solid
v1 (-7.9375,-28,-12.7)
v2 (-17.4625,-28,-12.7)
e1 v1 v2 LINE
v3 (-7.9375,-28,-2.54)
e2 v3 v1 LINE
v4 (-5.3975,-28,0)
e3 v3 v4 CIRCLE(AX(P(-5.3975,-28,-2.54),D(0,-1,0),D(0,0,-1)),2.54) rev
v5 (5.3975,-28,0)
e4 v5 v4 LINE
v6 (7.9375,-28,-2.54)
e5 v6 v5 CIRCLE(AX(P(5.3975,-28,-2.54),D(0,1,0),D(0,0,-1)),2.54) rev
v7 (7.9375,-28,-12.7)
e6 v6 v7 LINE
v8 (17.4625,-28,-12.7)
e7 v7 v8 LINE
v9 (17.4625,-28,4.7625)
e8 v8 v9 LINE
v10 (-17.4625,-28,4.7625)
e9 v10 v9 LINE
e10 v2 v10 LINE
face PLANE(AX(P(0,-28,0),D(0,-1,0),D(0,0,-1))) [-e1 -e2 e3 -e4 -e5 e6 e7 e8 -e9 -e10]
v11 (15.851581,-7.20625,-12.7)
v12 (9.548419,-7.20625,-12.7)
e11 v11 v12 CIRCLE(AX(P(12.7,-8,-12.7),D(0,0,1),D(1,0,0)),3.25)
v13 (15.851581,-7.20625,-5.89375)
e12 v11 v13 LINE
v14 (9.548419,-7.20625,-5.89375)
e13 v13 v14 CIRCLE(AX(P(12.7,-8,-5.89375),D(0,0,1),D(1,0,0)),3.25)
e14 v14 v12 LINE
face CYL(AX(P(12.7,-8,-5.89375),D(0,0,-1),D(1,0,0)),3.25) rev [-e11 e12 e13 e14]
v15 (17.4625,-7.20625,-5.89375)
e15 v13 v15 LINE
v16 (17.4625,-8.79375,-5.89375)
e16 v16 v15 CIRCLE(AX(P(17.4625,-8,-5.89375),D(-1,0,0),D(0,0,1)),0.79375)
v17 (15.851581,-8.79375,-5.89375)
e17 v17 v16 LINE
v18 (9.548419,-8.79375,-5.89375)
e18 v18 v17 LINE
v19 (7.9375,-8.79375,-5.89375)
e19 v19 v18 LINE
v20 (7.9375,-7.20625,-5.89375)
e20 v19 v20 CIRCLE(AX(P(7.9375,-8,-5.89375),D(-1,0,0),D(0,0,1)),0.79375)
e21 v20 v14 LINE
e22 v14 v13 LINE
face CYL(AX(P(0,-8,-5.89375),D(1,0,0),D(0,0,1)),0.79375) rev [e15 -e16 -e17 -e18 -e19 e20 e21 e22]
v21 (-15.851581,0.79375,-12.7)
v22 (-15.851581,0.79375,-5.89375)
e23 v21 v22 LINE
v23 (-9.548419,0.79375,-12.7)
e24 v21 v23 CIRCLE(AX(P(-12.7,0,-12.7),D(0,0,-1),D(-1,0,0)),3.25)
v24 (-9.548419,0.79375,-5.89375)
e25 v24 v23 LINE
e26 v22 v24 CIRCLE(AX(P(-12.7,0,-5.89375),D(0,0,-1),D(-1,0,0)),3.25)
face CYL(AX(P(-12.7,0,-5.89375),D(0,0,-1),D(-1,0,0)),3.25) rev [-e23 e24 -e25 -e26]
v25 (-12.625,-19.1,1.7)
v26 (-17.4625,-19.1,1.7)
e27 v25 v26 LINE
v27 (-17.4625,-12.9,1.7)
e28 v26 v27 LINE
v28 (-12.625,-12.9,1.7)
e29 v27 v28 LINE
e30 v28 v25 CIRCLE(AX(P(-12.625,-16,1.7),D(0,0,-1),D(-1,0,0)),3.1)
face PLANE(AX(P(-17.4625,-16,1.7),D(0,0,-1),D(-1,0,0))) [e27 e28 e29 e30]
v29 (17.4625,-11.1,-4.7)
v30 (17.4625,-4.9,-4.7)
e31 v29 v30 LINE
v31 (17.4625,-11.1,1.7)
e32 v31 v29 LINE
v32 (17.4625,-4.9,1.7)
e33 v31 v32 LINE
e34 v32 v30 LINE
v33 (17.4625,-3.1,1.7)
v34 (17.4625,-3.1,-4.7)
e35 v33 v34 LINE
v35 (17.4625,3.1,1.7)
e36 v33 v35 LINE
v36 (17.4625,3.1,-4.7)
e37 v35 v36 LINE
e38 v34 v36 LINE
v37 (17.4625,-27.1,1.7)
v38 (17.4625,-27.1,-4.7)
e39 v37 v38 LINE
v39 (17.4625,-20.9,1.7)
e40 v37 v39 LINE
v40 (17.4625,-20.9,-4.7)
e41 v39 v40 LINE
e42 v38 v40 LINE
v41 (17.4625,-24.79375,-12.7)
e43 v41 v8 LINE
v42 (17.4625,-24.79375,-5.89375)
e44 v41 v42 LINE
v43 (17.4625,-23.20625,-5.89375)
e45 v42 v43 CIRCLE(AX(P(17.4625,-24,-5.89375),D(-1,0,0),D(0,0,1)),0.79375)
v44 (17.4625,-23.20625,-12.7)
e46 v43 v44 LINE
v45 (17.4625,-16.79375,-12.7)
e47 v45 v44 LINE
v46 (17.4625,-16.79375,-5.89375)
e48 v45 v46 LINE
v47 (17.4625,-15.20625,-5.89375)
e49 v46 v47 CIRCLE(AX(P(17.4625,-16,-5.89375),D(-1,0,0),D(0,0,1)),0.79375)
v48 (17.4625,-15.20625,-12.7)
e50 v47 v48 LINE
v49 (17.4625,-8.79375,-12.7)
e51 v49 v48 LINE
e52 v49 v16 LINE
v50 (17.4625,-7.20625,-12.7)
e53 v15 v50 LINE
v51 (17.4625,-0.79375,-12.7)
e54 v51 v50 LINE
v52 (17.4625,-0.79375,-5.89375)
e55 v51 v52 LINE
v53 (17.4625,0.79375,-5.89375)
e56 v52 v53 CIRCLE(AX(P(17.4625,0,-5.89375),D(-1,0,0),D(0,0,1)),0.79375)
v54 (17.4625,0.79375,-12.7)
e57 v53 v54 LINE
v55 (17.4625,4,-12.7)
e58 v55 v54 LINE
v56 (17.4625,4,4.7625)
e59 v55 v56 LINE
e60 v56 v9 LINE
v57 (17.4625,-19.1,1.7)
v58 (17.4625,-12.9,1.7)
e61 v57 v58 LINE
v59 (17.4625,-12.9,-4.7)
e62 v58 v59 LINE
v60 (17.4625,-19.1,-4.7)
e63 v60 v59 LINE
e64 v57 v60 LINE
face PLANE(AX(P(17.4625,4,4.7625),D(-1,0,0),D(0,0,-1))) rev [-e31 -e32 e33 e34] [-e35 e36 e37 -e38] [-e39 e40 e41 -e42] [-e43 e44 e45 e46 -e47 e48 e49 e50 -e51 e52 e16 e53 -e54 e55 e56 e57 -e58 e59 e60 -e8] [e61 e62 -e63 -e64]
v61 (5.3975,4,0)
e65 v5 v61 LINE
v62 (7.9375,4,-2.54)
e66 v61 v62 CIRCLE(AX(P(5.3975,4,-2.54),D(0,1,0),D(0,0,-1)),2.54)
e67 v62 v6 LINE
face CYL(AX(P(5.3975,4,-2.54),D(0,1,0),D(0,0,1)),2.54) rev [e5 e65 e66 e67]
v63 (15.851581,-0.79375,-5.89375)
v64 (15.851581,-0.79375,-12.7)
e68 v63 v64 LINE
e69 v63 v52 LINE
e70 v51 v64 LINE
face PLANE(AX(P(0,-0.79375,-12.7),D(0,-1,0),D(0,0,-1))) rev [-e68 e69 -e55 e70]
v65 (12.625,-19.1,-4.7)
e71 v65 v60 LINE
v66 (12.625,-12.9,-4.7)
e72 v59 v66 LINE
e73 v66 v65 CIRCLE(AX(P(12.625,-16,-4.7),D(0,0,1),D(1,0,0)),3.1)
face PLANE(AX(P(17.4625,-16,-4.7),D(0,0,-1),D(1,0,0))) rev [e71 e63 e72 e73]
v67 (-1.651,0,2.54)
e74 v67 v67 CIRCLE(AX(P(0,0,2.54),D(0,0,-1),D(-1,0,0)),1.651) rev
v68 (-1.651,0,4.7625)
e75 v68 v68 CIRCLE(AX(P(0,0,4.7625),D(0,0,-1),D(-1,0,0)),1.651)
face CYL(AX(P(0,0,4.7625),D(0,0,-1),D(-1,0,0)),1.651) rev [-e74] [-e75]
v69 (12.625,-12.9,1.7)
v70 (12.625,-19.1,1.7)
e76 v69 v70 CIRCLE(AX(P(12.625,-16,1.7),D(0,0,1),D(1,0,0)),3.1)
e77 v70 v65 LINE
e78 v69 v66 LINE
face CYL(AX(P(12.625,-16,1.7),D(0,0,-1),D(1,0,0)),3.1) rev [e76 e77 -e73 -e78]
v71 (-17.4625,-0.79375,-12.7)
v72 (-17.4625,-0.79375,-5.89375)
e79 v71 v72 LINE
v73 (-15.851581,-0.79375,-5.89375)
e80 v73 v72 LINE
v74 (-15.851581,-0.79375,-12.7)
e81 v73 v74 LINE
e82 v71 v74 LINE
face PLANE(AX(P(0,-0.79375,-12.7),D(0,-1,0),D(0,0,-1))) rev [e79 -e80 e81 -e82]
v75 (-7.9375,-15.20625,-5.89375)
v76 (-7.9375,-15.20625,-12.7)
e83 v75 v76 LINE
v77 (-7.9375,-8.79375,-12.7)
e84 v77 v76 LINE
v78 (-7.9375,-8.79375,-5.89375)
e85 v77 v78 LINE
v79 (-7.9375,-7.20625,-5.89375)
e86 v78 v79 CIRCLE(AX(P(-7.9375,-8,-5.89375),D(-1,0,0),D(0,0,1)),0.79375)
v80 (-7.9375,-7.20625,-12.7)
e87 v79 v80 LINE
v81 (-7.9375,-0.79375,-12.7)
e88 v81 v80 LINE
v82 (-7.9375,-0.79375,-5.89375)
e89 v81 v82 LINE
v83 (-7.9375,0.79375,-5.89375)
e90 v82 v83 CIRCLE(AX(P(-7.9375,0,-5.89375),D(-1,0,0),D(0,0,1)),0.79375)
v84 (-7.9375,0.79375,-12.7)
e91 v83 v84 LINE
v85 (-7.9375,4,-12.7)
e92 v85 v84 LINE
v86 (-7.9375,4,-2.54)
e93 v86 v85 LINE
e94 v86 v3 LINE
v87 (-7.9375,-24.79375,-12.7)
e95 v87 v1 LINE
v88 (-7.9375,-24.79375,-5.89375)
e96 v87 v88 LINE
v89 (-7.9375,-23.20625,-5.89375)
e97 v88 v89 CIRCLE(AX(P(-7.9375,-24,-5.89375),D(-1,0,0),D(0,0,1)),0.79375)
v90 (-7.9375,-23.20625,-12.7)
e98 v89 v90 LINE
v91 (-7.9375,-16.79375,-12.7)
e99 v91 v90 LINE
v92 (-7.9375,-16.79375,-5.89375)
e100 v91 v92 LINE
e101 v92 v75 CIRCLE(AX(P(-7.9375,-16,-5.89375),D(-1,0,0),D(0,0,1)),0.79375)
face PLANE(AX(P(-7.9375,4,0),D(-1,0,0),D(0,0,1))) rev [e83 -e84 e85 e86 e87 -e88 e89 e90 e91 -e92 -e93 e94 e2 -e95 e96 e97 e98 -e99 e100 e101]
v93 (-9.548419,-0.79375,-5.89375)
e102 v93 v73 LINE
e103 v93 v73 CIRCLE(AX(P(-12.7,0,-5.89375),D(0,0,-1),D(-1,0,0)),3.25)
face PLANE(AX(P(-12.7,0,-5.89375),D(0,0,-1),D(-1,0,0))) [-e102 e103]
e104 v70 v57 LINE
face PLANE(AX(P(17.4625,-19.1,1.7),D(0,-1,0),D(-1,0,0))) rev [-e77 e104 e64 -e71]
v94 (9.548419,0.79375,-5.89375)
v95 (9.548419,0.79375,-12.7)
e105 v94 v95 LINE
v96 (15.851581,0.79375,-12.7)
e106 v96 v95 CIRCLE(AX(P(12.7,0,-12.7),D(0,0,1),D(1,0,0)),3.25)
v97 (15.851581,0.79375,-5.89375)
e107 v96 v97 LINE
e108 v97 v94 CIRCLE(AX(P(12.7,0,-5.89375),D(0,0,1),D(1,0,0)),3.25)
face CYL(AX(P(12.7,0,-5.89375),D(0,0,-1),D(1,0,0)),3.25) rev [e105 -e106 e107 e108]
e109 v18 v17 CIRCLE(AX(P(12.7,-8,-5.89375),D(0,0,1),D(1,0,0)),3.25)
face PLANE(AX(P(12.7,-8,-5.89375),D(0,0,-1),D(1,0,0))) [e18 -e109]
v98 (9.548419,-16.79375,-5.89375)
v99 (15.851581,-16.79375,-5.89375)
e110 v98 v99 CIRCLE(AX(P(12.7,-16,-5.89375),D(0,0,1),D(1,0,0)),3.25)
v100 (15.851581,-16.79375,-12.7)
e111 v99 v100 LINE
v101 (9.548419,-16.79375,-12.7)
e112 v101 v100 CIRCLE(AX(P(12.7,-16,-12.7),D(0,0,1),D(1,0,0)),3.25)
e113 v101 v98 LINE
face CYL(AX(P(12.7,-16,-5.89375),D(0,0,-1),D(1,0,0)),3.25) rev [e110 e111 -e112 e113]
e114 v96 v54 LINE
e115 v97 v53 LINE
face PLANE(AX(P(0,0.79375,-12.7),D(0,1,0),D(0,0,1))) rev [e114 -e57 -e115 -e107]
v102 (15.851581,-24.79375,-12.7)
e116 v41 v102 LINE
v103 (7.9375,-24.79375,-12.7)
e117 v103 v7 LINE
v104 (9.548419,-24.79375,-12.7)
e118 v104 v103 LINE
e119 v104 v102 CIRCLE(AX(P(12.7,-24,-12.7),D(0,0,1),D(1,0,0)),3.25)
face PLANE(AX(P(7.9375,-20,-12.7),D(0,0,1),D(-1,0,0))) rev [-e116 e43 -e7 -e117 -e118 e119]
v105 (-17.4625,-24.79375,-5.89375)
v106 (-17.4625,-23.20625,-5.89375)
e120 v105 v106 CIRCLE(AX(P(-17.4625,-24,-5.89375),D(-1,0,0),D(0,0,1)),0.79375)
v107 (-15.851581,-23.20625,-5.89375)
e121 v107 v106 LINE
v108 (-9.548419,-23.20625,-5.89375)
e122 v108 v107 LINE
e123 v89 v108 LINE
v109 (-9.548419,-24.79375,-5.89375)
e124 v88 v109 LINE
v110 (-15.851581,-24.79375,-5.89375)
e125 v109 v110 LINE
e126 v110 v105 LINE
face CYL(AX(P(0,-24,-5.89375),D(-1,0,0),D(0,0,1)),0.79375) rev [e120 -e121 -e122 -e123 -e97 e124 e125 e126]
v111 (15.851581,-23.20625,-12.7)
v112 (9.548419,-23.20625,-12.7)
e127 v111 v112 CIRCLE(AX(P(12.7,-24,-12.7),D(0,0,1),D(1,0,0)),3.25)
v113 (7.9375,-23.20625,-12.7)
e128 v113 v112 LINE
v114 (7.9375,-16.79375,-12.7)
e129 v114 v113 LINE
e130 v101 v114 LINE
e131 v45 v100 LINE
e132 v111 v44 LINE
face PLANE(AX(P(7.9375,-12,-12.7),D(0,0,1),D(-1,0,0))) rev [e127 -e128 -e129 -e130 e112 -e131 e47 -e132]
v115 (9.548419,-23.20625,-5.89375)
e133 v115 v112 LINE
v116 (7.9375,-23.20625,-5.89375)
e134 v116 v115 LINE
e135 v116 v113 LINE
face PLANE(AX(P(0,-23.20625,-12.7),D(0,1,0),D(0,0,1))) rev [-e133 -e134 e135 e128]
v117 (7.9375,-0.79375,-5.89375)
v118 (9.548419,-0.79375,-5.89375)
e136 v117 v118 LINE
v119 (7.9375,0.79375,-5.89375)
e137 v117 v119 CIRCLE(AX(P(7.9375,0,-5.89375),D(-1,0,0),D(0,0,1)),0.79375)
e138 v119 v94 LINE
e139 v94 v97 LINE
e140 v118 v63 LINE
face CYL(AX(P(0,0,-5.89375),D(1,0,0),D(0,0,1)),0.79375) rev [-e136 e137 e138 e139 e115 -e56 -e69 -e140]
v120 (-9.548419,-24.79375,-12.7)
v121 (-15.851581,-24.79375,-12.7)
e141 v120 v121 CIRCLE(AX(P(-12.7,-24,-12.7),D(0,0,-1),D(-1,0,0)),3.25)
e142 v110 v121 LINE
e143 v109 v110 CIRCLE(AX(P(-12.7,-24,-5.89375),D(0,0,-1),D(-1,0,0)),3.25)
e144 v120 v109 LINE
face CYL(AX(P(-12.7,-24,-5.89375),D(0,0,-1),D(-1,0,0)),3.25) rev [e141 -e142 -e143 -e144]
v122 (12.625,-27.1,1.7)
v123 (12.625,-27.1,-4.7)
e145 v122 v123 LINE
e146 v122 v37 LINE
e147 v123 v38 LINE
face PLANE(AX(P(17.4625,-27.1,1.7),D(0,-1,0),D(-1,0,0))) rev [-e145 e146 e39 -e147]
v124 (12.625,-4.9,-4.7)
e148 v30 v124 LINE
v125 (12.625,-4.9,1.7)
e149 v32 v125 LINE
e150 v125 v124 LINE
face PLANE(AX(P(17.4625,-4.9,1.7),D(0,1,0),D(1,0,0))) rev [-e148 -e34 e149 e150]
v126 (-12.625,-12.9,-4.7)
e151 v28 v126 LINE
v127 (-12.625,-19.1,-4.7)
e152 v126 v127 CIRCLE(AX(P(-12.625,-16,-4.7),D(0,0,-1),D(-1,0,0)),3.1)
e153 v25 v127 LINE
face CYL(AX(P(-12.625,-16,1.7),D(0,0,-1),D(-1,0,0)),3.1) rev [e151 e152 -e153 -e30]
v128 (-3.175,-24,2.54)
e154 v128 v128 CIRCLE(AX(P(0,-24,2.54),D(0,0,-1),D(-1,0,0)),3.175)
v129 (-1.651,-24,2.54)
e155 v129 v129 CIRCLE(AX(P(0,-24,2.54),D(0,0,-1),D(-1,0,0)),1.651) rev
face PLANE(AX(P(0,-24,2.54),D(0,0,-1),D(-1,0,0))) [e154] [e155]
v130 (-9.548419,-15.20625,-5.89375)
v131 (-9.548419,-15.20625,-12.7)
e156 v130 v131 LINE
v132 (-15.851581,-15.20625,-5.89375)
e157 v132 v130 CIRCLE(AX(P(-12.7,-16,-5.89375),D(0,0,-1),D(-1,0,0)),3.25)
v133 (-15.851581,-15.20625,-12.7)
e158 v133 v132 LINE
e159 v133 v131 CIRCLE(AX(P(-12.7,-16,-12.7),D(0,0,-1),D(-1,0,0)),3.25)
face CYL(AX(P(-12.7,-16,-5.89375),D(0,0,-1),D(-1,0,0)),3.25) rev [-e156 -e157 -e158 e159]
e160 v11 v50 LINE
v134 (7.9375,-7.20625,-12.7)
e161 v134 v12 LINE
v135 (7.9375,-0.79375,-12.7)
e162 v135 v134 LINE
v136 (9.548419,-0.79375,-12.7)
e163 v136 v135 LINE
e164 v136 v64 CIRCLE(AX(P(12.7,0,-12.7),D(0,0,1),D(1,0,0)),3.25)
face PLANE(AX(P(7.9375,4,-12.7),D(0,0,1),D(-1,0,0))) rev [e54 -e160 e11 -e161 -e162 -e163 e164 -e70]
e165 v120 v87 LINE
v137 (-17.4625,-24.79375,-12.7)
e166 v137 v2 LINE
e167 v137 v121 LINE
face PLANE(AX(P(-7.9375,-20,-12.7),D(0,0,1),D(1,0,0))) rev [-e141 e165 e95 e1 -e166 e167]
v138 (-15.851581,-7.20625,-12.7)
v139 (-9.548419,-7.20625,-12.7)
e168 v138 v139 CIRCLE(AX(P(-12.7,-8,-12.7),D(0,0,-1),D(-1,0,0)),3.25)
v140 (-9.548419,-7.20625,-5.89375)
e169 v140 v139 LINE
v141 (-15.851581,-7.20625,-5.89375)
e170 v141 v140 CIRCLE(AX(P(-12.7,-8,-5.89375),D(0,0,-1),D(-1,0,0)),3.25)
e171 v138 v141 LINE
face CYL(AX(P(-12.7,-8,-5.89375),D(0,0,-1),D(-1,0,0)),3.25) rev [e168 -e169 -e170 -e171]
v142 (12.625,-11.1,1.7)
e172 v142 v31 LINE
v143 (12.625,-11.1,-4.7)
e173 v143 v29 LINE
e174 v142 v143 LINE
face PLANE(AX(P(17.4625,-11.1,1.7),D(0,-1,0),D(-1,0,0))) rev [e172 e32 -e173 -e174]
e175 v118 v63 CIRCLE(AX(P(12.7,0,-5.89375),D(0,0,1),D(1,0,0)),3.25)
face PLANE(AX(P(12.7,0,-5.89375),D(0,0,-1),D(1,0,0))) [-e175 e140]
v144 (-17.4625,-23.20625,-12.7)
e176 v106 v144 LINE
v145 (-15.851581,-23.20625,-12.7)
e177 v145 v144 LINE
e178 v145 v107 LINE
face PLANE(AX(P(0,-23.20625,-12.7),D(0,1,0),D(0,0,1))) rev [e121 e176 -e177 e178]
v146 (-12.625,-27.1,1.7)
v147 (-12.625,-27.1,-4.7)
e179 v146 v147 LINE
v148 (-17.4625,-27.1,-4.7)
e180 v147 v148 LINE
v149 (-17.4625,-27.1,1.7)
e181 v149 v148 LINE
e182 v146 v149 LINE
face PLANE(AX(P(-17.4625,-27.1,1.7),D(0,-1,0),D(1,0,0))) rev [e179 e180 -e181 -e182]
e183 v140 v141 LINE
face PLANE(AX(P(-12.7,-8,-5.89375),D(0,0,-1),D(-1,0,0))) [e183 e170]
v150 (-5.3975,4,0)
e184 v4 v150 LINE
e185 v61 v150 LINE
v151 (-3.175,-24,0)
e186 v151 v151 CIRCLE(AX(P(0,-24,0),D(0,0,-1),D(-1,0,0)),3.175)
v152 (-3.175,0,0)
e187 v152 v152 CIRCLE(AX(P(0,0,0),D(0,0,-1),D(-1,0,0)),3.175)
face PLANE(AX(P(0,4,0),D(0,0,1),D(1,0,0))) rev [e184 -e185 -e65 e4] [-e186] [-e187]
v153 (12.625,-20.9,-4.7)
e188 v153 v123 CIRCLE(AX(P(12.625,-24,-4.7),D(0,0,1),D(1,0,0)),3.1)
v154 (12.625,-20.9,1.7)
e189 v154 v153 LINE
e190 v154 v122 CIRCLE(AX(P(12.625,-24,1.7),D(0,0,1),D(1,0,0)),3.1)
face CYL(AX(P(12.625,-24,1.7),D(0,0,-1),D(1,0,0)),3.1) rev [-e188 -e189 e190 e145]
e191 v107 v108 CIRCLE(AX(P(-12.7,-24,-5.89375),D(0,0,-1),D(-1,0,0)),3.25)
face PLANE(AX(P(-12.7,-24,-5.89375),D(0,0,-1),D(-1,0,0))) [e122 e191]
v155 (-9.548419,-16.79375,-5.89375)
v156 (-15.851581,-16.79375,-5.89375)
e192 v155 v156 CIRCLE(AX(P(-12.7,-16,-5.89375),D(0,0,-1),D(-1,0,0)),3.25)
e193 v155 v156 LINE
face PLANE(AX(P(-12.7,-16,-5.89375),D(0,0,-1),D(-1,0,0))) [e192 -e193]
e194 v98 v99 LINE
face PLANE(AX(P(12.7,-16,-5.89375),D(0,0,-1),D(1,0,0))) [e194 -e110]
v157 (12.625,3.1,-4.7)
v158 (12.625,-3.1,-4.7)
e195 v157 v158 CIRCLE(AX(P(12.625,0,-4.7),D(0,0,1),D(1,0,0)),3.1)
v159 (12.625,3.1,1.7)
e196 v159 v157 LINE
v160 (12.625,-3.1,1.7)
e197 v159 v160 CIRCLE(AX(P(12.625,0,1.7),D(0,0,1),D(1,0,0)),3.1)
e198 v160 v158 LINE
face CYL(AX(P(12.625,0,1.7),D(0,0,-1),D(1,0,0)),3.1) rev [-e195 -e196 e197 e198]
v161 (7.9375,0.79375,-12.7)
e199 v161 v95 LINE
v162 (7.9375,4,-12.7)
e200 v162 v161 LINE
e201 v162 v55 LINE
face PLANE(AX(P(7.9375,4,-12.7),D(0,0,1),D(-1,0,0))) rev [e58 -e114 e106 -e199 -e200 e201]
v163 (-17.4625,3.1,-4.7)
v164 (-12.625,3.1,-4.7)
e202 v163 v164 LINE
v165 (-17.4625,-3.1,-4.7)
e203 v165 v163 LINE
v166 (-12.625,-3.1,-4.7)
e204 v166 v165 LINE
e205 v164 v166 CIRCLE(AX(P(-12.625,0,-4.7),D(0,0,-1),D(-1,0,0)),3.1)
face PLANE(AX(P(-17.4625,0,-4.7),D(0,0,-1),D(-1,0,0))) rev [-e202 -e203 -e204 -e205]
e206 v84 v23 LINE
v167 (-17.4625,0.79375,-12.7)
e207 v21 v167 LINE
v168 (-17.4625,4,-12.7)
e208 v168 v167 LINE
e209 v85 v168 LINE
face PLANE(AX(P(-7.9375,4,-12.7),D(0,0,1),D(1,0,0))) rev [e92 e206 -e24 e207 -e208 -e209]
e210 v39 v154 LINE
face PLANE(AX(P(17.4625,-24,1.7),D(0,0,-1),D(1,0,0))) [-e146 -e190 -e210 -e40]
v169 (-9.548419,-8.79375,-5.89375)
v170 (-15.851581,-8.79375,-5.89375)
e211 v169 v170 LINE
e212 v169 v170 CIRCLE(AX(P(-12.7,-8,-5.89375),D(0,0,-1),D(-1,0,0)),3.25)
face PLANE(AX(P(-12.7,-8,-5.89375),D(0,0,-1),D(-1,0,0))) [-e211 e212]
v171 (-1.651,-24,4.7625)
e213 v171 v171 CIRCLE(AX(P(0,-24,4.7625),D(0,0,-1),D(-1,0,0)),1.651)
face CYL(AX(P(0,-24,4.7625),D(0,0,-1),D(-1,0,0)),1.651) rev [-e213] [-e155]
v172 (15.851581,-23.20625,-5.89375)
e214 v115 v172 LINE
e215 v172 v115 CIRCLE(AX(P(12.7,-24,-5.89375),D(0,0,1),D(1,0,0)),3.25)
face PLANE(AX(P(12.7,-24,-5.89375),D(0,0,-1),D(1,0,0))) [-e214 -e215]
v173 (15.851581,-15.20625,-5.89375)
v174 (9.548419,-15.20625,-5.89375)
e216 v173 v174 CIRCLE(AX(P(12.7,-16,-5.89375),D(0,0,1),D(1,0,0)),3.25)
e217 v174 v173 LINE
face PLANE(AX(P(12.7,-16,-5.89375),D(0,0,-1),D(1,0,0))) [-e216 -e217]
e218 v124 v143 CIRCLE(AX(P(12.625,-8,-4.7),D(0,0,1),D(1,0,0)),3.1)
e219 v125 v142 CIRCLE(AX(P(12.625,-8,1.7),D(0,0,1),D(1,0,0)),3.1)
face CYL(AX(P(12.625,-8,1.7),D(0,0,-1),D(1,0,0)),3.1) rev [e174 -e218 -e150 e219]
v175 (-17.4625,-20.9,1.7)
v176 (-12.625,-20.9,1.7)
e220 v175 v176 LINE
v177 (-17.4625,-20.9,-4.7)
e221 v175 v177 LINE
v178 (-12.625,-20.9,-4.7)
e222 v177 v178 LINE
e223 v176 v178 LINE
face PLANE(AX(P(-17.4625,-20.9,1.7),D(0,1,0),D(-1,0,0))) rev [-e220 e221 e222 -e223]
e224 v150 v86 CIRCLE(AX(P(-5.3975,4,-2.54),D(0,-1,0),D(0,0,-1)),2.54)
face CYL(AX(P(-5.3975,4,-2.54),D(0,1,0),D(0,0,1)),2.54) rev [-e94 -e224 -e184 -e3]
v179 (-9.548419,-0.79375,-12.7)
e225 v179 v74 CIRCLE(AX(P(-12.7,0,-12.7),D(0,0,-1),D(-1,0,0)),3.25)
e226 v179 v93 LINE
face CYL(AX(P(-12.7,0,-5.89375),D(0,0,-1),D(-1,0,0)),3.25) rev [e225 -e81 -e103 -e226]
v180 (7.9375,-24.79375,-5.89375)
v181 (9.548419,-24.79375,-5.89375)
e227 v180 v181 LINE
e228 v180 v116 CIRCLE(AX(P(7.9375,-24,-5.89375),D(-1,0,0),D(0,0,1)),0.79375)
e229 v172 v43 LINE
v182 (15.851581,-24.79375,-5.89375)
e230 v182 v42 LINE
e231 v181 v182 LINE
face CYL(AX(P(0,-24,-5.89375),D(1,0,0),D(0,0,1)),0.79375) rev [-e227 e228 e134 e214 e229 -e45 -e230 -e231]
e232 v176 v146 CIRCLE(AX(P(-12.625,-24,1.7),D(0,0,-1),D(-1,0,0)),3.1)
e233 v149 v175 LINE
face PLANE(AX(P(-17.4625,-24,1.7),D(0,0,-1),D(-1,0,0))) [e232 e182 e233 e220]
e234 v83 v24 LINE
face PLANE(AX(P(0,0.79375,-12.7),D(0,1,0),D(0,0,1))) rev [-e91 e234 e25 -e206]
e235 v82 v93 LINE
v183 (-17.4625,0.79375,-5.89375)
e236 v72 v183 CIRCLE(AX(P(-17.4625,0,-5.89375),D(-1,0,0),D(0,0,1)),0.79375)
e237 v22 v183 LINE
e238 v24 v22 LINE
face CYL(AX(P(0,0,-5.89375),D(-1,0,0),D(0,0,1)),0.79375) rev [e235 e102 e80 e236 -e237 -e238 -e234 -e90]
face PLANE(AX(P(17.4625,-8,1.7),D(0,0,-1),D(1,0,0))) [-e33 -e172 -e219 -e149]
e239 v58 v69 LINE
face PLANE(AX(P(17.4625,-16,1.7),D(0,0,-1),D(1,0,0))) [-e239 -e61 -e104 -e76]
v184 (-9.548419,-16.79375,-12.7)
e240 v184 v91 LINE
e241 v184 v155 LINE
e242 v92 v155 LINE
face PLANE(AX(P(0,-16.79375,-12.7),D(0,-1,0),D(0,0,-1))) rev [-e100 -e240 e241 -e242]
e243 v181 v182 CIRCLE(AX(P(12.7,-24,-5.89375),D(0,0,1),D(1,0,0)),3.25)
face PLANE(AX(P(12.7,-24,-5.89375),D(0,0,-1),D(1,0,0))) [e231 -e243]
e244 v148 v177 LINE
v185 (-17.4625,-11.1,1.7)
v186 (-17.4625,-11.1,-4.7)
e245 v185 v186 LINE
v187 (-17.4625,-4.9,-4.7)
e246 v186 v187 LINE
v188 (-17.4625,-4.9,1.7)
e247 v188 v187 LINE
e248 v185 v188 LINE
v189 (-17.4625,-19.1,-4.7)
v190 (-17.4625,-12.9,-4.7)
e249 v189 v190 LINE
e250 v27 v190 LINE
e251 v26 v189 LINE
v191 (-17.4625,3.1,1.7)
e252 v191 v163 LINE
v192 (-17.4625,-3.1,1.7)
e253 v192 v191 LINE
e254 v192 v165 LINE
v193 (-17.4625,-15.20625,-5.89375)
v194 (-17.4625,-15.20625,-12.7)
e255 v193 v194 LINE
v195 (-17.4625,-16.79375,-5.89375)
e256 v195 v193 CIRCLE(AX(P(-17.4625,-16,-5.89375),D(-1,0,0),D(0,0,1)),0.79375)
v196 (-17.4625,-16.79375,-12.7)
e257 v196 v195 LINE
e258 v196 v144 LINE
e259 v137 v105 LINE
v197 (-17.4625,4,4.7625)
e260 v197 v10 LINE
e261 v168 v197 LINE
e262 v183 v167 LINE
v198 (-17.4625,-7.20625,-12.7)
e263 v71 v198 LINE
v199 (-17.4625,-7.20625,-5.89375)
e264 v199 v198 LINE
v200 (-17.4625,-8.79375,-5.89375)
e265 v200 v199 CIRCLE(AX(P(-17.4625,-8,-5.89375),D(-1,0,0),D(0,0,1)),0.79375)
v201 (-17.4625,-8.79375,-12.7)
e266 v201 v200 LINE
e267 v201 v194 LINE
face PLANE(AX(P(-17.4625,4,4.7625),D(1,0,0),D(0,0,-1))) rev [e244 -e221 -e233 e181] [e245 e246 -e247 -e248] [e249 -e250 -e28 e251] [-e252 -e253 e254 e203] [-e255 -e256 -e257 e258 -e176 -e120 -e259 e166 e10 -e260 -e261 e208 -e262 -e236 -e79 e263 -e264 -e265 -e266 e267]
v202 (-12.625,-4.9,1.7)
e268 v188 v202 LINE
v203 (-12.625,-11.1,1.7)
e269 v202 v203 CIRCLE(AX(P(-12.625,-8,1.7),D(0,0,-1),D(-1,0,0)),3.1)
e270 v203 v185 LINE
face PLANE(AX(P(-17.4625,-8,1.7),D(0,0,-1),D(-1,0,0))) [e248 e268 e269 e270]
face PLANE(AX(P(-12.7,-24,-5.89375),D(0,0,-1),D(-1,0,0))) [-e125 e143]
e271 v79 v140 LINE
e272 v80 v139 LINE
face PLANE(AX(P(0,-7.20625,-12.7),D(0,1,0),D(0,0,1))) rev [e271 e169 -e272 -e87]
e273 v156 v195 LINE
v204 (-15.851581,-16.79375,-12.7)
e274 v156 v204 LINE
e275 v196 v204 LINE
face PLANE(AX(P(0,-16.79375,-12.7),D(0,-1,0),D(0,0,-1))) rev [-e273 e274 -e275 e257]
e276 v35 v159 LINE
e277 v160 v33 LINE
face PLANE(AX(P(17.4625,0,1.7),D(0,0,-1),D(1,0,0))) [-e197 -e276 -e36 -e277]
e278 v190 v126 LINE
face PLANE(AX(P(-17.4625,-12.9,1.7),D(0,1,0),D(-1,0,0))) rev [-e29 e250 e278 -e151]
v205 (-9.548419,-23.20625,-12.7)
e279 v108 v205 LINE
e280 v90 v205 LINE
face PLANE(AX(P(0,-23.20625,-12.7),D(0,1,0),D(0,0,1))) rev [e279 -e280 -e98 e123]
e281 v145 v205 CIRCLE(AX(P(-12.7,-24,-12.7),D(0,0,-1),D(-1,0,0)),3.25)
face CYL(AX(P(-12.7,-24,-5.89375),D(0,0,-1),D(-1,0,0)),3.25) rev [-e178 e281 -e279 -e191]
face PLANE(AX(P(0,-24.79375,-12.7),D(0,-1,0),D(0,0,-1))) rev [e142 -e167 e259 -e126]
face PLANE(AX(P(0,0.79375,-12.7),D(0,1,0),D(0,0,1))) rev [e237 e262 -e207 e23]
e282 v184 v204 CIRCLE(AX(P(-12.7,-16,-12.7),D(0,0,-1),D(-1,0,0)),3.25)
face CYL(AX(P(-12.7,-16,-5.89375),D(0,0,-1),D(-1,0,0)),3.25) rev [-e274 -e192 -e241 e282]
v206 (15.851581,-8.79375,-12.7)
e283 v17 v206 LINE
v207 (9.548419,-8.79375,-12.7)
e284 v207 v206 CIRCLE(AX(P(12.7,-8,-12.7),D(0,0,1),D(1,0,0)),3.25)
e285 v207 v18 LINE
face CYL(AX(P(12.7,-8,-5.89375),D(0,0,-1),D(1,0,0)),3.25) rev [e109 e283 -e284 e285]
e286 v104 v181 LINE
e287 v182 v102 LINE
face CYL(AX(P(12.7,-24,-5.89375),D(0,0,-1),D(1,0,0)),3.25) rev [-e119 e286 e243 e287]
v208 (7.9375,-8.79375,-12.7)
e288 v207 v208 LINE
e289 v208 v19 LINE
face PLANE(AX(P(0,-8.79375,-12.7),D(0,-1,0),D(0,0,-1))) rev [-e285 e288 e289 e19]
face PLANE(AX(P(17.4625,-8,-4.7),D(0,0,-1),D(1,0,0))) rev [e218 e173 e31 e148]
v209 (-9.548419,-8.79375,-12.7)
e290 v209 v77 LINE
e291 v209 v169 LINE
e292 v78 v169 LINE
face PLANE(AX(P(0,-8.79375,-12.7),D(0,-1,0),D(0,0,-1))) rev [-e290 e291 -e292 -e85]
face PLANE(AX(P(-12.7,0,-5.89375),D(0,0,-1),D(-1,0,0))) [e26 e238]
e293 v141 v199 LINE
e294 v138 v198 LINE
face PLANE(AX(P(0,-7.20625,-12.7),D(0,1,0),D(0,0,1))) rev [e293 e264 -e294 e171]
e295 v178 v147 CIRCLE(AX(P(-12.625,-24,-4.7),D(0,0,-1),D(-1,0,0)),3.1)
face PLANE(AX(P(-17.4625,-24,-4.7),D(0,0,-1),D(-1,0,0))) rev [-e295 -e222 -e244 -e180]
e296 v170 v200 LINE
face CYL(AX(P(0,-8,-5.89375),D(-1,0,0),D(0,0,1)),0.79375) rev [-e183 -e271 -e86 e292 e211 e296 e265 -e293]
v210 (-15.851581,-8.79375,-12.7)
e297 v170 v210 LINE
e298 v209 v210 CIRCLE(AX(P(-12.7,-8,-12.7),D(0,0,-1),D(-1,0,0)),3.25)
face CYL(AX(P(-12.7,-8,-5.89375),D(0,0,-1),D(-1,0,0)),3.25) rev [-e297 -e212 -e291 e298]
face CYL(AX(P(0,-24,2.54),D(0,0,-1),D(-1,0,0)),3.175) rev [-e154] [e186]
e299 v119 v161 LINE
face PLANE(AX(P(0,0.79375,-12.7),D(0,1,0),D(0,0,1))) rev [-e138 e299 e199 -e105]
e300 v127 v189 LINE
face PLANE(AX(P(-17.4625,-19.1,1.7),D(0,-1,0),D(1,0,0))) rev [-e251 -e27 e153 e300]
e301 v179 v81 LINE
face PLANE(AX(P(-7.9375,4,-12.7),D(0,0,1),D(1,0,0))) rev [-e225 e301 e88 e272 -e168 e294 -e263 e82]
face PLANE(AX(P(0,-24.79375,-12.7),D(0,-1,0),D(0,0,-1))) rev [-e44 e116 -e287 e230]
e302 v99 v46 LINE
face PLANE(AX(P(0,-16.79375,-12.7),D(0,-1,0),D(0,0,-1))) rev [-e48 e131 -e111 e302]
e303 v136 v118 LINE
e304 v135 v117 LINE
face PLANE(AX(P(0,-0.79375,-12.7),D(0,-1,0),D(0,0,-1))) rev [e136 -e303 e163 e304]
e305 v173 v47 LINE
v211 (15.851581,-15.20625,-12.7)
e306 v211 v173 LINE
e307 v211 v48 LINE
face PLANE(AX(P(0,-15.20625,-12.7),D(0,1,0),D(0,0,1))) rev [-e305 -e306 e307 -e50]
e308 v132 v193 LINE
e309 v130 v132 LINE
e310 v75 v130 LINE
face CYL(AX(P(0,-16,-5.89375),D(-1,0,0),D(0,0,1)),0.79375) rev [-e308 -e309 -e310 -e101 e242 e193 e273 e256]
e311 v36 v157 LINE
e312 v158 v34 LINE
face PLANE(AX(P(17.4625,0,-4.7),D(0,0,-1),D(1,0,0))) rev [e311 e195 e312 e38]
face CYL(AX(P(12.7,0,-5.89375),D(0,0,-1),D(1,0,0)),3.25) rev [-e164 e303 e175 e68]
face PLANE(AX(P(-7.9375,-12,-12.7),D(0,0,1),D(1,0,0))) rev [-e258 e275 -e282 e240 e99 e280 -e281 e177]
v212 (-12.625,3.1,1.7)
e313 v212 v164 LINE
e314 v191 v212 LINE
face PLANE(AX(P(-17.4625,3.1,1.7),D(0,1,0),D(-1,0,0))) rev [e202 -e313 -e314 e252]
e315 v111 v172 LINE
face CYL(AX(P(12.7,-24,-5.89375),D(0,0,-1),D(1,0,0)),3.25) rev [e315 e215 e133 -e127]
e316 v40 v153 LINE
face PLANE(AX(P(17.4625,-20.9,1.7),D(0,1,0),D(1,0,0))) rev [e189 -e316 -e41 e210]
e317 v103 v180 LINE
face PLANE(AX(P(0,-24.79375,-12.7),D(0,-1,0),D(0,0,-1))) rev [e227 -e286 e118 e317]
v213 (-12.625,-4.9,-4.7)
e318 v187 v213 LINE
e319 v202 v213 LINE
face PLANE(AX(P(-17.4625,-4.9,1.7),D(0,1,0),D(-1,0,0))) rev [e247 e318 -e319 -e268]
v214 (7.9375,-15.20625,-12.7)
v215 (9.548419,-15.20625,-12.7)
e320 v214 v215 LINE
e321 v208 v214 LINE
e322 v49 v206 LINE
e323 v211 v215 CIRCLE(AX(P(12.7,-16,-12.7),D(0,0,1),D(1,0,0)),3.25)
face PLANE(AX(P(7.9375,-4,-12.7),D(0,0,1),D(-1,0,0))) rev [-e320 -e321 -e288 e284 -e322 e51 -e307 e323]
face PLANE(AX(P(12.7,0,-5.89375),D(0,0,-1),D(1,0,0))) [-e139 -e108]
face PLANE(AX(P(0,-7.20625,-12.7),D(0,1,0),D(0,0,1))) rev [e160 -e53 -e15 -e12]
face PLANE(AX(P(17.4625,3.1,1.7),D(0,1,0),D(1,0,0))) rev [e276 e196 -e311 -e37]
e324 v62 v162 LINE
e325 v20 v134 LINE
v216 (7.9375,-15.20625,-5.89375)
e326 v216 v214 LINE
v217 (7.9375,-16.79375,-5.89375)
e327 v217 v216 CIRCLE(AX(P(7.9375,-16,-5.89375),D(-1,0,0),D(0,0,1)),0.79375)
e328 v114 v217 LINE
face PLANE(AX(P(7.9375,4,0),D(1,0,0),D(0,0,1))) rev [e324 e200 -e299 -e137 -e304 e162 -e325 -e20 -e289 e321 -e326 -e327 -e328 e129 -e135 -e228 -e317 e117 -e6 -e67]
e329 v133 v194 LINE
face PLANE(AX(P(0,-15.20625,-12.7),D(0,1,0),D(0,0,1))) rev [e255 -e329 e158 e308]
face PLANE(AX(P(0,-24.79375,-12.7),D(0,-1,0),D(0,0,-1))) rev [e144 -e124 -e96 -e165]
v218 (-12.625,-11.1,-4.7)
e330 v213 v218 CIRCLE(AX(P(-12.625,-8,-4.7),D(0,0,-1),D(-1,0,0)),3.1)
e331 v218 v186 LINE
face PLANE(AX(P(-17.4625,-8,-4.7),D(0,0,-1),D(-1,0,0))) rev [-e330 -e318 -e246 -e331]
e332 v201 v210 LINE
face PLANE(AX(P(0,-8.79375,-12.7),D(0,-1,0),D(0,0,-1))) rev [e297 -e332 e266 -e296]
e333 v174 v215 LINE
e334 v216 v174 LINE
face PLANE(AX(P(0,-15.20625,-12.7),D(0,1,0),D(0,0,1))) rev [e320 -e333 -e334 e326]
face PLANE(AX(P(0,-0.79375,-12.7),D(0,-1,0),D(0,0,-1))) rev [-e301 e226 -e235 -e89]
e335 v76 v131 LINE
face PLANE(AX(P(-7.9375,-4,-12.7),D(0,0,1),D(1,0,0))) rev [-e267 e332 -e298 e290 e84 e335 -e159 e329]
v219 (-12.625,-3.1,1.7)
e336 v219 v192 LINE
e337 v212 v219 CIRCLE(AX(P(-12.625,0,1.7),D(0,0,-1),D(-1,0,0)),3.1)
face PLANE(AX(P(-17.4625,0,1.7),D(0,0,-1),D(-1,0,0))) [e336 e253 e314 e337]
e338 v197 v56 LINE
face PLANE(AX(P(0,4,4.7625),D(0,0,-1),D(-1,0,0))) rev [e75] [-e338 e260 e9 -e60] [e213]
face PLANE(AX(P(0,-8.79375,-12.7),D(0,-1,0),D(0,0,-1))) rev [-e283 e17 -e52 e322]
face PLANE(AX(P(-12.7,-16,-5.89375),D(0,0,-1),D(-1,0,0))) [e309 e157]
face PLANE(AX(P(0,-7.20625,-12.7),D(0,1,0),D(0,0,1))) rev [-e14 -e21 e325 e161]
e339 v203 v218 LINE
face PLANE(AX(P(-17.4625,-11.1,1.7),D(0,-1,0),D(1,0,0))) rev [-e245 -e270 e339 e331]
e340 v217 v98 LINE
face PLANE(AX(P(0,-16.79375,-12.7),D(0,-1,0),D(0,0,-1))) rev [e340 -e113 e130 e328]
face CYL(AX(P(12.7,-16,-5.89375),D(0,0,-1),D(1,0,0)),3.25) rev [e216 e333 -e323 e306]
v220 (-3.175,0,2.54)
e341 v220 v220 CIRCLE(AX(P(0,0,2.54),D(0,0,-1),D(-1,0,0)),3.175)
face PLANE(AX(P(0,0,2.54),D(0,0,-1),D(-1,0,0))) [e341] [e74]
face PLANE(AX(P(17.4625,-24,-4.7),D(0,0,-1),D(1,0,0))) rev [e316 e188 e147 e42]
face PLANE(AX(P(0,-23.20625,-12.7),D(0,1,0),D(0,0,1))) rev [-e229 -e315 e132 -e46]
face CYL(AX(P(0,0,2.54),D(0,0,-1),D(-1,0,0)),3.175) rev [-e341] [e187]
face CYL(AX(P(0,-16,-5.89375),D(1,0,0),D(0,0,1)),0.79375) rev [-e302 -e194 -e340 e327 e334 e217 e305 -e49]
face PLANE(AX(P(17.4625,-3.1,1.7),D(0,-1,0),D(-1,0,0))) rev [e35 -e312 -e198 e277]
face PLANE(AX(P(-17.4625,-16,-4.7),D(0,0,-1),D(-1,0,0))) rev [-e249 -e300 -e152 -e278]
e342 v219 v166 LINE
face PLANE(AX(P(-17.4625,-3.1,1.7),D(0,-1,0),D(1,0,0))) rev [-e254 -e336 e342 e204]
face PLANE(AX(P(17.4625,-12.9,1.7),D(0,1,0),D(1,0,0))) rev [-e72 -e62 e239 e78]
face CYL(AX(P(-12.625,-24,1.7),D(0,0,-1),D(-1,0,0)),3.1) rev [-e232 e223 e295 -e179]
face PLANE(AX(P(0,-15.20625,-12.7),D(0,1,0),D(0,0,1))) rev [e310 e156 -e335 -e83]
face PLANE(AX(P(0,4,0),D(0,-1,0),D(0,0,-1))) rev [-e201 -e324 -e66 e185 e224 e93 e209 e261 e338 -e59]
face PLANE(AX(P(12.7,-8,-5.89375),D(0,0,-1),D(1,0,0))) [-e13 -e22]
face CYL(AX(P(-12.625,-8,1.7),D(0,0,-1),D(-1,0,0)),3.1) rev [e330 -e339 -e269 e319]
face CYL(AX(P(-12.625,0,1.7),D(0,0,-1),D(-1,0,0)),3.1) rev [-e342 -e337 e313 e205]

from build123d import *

# Parameters (mm, degrees)
BOSS_EXTRUDE1_START = -4
BOSS_EXTRUDE1_DEPTH = 8
CUT_EXTRUDE1_START  = -8
CUT_EXTRUDE1_DEPTH  = 6.4
CUT_EXTRUDE2_DEPTH  = 22.959710978
FILLET1_R           = 2.54
SKETCH6_R           = 3.25
CUT_EXTRUDE5_DEPTH  = 6.80625
LPATTERN1_COUNT     = 4
LPATTERN1_PITCH     = 8
SKETCH4_R           = 1.651
CUT_EXTRUDE3_DEPTH  = 36.358576134
SKETCH5_R           = 3.175
CUT_EXTRUDE4_DEPTH  = 2.54


# Read off the part's stored shape, not the designer's step: Boss-Extrude1
with BuildPart() as part:
    # Boss-Extrude1 outline → Boss-Extrude1 (new body)
    with BuildSketch(Plane(origin=(0, 0, 0), x_dir=(1, 0, 0), z_dir=(0, 1, 0)).offset(BOSS_EXTRUDE1_START)):
        Polygon((0, -4.7625), (0, 0), (-7.9375, 0), (-7.9375, 12.7), (-17.4625, 12.7), (-17.4625, -4.7625), align=None)
    extrude(amount=BOSS_EXTRUDE1_DEPTH)

    # Sketch2 → Cut-Extrude1 (cut)
    with BuildSketch(Plane(origin=(0, 0, -12.7), x_dir=(-1, 0, 0), z_dir=(0, 0, -1)).offset(CUT_EXTRUDE1_START)):
        with BuildLine():
            Line((17.4625, -3.1), (12.625, -3.1))
            ThreePointArc((12.625, -3.1), (9.525, 0), (12.625, 3.1))
            Line((12.625, 3.1), (17.4625, 3.1))
            ThreePointArc((17.4625, 3.1), (20.5625, 0), (17.4625, -3.1))
        make_face()
    extrude(amount=-CUT_EXTRUDE1_DEPTH, mode=Mode.SUBTRACT)

    # Sketch3 → Cut-Extrude2 (cut, through all)
    with BuildSketch(Plane.ZY.offset(17.4625)):
        with BuildLine():
            Line((-12.7, 0.79375), (-5.89375, 0.79375))
            ThreePointArc((-5.89375, 0.79375), (-5.1, 0), (-5.89375, -0.79375))
            Line((-5.89375, -0.79375), (-12.7, -0.79375))
            ThreePointArc((-12.7, -0.79375), (-13.49375, 0), (-12.7, 0.79375))
        make_face()
    extrude(amount=-CUT_EXTRUDE2_DEPTH, mode=Mode.SUBTRACT)

    # Fillet1
    fillet1_edges = [part.edges().sort_by_distance(p)[0] for p in [
        (-7.9375, 0, 0),
    ]]
    fillet(fillet1_edges, radius=FILLET1_R)

    # Sketch6 → Cut-Extrude5 (cut)
    with BuildSketch(Plane(origin=(0, 0, -12.7), x_dir=(-1, 0, 0), z_dir=(0, 0, -1))):
        with Locations((12.7, 0)):
            Circle(SKETCH6_R)
    extrude(amount=-CUT_EXTRUDE5_DEPTH, mode=Mode.SUBTRACT)

    # Mirror1: part across plane


with BuildPart() as part_1:
    add(part.part)
    add(part.part.mirror(Plane(origin=(0, 4, 0), x_dir=(0, 0, 1), z_dir=(-1, 0, 0))))


with BuildPart() as lpattern1_1:
    # LPattern1: pattern copy
    add(part_1.part.moved(Location(Vector(0, -1, 0) * (1 * LPATTERN1_PITCH))))


with BuildPart() as lpattern1_2:
    # LPattern1: pattern copy
    add(part_1.part.moved(Location(Vector(0, -1, 0) * (2 * LPATTERN1_PITCH))))


with BuildPart() as lpattern1_3:
    # LPattern1: pattern copy
    add(part_1.part.moved(Location(Vector(0, -1, 0) * (3 * LPATTERN1_PITCH))))


with BuildPart() as part_2:
    add(part_1.part)

    # Combine1: union LPattern1_1, LPattern1_2, LPattern1_3
    add(lpattern1_1.part)
    add(lpattern1_2.part)
    add(lpattern1_3.part)

    # Sketch4 → Cut-Extrude3 (cut, through all)
    with BuildSketch(Plane(origin=(0, 0, 0), x_dir=(-1, 0, 0), z_dir=(0, 0, -1))):
        Circle(SKETCH4_R)
        with Locations((0, -24)):
            Circle(SKETCH4_R)
    extrude(amount=-CUT_EXTRUDE3_DEPTH, mode=Mode.SUBTRACT)

    # Sketch5 → Cut-Extrude4 (cut)
    with BuildSketch(Plane(origin=(0, 0, 0), x_dir=(-1, 0, 0), z_dir=(0, 0, -1))):
        Circle(SKETCH5_R)
        with Locations((0, -24)):
            Circle(SKETCH5_R)
    extrude(amount=-CUT_EXTRUDE4_DEPTH, mode=Mode.SUBTRACT)


solid = part_2.part
